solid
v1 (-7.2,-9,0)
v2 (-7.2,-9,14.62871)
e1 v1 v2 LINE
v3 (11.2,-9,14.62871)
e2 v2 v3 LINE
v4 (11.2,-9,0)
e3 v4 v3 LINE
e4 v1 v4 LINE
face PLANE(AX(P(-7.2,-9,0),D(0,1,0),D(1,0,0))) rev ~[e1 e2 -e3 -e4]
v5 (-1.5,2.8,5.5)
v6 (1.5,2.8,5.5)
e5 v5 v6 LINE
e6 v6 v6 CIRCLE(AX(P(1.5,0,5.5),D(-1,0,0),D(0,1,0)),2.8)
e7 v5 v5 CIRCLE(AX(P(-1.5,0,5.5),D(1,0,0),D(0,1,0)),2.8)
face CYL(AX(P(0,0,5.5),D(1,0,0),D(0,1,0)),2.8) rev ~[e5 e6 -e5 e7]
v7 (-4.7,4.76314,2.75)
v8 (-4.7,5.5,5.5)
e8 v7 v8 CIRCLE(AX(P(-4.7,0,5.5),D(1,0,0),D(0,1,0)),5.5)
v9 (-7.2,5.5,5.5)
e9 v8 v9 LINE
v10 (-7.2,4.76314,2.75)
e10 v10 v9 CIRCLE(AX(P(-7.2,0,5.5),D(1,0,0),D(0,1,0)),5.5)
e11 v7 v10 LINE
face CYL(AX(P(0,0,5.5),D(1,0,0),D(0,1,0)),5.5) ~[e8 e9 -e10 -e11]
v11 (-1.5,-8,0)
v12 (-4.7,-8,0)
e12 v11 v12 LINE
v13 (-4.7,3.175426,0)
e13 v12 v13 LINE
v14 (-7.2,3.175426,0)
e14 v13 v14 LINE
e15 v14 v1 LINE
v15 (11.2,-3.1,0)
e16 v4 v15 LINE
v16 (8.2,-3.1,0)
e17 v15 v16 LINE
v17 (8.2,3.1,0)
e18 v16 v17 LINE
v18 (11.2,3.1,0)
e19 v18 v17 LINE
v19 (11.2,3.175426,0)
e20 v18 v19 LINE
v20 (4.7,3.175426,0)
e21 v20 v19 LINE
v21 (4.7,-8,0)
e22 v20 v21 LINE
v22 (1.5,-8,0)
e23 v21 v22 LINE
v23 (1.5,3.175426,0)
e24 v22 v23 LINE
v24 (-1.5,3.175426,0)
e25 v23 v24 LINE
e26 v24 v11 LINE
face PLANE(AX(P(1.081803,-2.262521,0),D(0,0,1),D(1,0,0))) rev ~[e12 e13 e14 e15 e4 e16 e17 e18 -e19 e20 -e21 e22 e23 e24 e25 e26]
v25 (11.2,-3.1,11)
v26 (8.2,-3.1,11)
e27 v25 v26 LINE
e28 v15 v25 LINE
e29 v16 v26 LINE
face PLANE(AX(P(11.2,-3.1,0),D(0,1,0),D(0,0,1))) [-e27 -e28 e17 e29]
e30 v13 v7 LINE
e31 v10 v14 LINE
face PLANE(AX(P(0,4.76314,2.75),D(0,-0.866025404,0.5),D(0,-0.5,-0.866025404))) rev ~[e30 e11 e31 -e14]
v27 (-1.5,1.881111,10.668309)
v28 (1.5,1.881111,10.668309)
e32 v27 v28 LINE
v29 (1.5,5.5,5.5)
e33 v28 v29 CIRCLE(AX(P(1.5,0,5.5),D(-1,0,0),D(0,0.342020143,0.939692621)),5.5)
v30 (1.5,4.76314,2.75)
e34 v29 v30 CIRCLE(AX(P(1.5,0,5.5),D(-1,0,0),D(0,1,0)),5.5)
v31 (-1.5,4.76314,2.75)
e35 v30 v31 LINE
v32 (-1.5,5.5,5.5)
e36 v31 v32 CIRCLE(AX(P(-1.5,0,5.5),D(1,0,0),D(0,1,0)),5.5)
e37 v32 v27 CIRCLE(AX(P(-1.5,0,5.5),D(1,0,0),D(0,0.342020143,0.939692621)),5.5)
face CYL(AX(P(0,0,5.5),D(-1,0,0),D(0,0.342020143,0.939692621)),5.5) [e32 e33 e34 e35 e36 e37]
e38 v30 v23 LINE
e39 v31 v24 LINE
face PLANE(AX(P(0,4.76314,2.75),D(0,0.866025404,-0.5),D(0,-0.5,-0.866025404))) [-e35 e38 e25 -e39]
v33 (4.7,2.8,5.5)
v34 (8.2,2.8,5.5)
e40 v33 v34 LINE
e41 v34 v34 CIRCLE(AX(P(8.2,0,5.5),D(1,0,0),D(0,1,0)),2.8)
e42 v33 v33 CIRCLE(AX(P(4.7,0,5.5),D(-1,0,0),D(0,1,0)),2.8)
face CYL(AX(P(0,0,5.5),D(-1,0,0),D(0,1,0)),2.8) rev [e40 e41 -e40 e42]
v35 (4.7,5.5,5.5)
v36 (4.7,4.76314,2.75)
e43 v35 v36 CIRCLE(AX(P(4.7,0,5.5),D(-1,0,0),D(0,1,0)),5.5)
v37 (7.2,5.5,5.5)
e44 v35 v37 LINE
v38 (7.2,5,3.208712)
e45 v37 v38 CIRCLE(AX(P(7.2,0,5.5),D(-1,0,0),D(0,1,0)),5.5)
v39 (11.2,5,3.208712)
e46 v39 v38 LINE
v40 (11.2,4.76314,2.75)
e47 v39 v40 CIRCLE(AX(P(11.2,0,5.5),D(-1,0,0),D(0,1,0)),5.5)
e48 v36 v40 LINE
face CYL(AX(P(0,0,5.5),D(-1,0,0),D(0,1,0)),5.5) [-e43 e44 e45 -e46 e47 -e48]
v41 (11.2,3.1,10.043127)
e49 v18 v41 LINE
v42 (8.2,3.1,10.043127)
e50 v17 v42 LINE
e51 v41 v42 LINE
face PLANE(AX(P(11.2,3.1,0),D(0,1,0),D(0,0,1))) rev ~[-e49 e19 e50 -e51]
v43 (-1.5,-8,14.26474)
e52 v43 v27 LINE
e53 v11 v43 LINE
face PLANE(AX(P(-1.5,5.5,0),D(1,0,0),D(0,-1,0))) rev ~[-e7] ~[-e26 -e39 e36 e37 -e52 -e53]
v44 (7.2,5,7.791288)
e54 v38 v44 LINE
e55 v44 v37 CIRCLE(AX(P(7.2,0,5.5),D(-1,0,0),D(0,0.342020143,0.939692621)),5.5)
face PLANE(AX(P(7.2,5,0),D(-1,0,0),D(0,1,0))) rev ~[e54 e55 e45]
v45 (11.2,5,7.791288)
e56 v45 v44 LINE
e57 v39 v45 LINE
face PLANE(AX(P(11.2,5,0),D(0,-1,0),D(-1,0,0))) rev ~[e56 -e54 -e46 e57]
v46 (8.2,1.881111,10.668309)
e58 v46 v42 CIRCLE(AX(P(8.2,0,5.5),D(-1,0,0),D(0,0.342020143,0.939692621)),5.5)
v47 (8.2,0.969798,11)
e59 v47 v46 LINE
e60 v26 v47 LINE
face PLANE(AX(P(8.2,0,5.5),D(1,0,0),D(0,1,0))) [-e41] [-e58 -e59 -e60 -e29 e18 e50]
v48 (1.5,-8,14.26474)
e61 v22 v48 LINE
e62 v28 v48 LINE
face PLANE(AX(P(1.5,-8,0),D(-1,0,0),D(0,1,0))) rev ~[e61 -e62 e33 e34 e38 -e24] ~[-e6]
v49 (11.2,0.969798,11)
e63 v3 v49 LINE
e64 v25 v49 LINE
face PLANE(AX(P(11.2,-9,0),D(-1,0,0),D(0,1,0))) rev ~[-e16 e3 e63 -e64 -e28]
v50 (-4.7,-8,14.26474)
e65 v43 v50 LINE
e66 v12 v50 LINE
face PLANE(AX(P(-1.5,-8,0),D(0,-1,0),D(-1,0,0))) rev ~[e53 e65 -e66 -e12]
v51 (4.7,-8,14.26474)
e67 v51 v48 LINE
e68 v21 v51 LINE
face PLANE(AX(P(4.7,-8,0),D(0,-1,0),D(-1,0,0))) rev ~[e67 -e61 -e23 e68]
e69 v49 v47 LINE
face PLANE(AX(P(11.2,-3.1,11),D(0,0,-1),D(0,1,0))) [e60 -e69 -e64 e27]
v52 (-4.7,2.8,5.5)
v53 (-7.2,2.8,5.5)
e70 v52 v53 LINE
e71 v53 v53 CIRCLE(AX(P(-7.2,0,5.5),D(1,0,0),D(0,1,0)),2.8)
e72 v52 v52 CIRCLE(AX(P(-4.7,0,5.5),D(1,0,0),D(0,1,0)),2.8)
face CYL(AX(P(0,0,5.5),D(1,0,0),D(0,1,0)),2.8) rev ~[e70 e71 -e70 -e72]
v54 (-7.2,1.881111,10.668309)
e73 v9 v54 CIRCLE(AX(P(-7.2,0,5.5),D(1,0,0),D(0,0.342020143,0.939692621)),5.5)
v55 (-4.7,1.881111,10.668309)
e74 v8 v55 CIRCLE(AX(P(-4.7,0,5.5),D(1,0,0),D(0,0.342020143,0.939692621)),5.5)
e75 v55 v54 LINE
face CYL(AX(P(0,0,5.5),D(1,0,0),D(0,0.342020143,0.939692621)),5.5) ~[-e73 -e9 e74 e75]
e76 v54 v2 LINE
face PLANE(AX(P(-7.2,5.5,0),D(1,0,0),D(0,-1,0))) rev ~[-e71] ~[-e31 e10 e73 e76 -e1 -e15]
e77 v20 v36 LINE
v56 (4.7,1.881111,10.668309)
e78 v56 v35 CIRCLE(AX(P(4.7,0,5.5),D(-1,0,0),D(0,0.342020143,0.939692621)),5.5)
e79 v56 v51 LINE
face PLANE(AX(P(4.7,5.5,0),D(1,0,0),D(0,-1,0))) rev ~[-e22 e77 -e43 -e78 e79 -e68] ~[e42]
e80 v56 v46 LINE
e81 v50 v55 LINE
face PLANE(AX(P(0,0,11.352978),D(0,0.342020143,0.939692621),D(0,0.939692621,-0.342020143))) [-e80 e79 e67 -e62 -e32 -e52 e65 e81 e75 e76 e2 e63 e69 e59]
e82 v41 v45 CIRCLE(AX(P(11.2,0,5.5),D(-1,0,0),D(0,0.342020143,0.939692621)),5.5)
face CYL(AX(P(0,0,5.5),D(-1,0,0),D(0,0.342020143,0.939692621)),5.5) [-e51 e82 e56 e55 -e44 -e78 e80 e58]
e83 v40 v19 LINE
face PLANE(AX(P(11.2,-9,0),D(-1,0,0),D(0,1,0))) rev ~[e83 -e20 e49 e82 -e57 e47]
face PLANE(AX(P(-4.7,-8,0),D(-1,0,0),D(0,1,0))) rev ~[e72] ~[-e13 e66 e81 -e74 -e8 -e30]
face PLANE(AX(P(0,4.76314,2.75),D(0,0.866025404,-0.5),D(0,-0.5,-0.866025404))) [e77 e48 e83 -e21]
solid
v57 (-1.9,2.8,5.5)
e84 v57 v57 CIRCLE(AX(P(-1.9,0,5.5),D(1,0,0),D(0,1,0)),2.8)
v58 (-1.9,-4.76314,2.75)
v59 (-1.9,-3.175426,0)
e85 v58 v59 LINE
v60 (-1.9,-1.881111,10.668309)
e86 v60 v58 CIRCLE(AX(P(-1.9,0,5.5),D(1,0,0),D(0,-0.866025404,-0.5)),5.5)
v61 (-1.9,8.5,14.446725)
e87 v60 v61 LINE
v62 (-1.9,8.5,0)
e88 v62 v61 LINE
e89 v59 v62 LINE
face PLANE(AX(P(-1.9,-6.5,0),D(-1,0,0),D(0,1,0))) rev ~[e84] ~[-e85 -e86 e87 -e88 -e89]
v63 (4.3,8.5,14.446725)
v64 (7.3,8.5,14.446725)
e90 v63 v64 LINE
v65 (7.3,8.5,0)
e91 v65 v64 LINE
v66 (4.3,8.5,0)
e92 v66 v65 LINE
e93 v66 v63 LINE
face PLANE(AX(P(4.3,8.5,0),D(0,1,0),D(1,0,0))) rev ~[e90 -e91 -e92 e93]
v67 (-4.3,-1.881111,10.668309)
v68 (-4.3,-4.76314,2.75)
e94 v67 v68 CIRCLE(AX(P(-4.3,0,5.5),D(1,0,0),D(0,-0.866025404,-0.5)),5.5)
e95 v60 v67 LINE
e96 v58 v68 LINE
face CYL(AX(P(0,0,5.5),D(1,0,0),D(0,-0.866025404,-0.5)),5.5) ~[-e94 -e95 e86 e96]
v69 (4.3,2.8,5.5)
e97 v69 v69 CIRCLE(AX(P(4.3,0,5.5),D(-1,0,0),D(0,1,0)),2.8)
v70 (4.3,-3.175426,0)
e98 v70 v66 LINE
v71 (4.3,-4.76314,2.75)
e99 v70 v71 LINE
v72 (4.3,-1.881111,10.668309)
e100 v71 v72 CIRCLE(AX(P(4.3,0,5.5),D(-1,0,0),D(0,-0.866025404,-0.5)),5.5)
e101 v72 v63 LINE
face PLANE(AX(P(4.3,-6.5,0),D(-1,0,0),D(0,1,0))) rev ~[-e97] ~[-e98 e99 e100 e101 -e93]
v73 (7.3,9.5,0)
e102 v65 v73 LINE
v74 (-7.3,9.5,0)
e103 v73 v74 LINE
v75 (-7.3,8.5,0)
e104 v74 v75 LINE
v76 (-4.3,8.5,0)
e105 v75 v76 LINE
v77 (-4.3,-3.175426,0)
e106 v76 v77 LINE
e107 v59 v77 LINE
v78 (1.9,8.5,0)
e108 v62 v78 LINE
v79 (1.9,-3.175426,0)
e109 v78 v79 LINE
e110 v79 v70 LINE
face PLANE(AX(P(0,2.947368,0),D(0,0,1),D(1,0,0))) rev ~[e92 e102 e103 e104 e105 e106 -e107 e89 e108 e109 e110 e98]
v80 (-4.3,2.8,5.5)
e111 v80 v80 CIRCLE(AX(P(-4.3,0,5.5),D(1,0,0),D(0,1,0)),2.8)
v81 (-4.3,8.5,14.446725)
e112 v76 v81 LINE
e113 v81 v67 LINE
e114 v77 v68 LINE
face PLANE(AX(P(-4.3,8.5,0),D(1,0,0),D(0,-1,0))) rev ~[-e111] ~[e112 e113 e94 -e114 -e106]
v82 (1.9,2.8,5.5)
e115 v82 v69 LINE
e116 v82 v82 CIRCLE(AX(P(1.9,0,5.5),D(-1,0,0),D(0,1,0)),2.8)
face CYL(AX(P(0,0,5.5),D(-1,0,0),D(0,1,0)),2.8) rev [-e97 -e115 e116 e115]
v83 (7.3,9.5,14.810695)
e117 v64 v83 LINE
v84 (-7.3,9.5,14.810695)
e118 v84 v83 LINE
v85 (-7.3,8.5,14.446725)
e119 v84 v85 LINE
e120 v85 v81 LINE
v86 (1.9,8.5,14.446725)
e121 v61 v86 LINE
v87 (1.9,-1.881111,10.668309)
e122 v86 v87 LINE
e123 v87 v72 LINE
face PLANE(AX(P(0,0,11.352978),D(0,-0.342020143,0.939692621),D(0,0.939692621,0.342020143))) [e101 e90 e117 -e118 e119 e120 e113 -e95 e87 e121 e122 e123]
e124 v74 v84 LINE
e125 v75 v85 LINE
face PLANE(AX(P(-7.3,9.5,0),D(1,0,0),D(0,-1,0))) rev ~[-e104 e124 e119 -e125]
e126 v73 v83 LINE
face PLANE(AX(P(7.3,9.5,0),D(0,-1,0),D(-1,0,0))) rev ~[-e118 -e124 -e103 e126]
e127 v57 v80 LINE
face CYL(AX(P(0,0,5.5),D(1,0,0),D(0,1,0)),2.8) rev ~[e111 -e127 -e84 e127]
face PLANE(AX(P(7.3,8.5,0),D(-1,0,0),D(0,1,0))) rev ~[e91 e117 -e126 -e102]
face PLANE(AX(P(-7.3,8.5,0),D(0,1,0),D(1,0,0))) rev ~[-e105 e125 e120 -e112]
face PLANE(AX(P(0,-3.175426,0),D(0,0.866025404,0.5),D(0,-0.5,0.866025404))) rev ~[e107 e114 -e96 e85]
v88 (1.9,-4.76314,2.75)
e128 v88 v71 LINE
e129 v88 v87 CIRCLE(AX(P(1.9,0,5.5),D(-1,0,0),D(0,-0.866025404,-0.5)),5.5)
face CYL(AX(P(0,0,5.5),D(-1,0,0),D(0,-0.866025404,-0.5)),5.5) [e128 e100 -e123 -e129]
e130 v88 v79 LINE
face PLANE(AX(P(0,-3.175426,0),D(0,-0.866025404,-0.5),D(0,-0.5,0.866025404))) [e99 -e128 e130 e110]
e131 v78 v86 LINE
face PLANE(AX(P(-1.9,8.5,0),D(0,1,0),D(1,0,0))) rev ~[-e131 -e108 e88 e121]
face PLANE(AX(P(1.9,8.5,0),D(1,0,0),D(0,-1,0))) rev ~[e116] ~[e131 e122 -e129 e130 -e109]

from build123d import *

# Parameters (mm, degrees)
F1_DEPTH      = 25
F2_R          = 2.8
F3_DEPTH      = 7.301
F3_DEPTH_BACK = 11.201
F4_DEPTH      = 7.301
F4_DEPTH_BACK = 11.201
F5_DEPTH      = 7.301
F5_DEPTH_BACK = 11.201
F6_W          = 6.2
F6_H          = 11
F6_R          = 2.8
F7_DEPTH      = 3


with BuildPart() as f1:
    # F0 (on Top) → F1 (new body)
    with BuildSketch(Plane.XY):
        Polygon((7.3, 9.5), (0, 9.5), (-7.3, 9.5), (-7.3, 8.5), (-4.3, 8.5), (-4.3, -6.5), (-1.9, -6.5), (-1.9, 8.5), (0, 8.5), (1.9, 8.5), (1.9, -6.5), (4.3, -6.5), (4.3, 8.5), (7.3, 8.5), align=None)
    extrude(amount=F1_DEPTH)


with BuildPart() as f1b:
    # F0 (on Top) → F1, piece 2 (new body)
    with BuildSketch(Plane.XY):
        Polygon((1.5, 5.5), (0, 5.5), (-1.5, 5.5), (-1.5, -8), (-4.7, -8), (-4.7, 5.5), (-7.2, 5.5), (-7.2, -9), (11.2, -9), (11.2, 5), (7.2, 5), (7.2, 5.5), (4.7, 5.5), (4.7, -8), (1.5, -8), align=None)
    extrude(amount=F1_DEPTH)

    # F2 (on Right) → F3 (cut, two sides)
    with BuildSketch(Plane.YZ) as f3_sk:
        with Locations((0, 5.5)):
            Circle(F2_R)
        with BuildLine():
            ThreePointArc((1.8811107883, 10.6683094143), (4.5053362436, 8.6546703999), (5.5, 5.5))
            ThreePointArc((5.5, 5.5), (5.3125920446, 4.0764952519), (4.7631397208, 2.75))
            Line((4.7631397208, 2.75), (3.1754264805, 0))
            Line((3.1754264805, 0), (37.4948854785, 0))
            Line((37.4948854785, 0), (37.4948854785, 25))
            Line((37.4948854785, 25), (0, 11.3529777486))
            Line((0, 11.3529777486), (1.8811107883, 10.6683094143))
        make_face()
    extrude(amount=-F3_DEPTH, mode=Mode.SUBTRACT)
    extrude(f3_sk.sketch, amount=F3_DEPTH_BACK, mode=Mode.SUBTRACT)


with BuildPart() as f4_tool:
    # F2 (on Right) → F4 (new body, two sides)
    with BuildSketch(Plane.YZ) as f4_sk:
        with Locations((0, 5.5)):
            Circle(F2_R)
        Polygon((-37.4948854785, 25), (0, 11.3529777486), (37.4948854785, 25), align=None)
    extrude(amount=-F4_DEPTH)
    extrude(f4_sk.sketch, amount=F4_DEPTH_BACK)


with BuildPart() as f1_1:
    add(f1.part)

    # F4: cut by f4_tool
    add(f4_tool.part, mode=Mode.SUBTRACT)

    # F2 (on Right) → F5 (cut, two sides)
    with BuildSketch(Plane.YZ) as f5_sk:
        Polygon((-37.4948854785, 25), (0, 11.3529777486), (37.4948854785, 25), align=None)
        with BuildLine():
            ThreePointArc((-4.7631397208, 2.75), (-5.1683094143, 7.3811107883), (-1.8811107883, 10.6683094143))
            Line((-1.8811107883, 10.6683094143), (0, 11.3529777486))
            Line((0, 11.3529777486), (-37.4948854785, 25))
            Line((-37.4948854785, 25), (-37.4948854785, 0))
            Line((-37.4948854785, 0), (-3.1754264805, 0))
            Line((-3.1754264805, 0), (-4.7631397208, 2.75))
        make_face()
    extrude(amount=-F5_DEPTH, mode=Mode.SUBTRACT)
    extrude(f5_sk.sketch, amount=F5_DEPTH_BACK, mode=Mode.SUBTRACT)


with BuildPart() as f1b_1:
    add(f1b.part)

    # F4: cut by f4_tool
    add(f4_tool.part, mode=Mode.SUBTRACT)

    # F6 (on face) → F7 (cut)
    with BuildSketch(Plane.YZ.offset(11.2)):
        with Locations((0, 5.5)):
            Rectangle(F6_W, F6_H)
        with Locations((0, 5.5)):
            Circle(F6_R, mode=Mode.SUBTRACT)
    extrude(amount=-F7_DEPTH, mode=Mode.SUBTRACT)


solid = Compound([f1_1.part, f1b_1.part])
